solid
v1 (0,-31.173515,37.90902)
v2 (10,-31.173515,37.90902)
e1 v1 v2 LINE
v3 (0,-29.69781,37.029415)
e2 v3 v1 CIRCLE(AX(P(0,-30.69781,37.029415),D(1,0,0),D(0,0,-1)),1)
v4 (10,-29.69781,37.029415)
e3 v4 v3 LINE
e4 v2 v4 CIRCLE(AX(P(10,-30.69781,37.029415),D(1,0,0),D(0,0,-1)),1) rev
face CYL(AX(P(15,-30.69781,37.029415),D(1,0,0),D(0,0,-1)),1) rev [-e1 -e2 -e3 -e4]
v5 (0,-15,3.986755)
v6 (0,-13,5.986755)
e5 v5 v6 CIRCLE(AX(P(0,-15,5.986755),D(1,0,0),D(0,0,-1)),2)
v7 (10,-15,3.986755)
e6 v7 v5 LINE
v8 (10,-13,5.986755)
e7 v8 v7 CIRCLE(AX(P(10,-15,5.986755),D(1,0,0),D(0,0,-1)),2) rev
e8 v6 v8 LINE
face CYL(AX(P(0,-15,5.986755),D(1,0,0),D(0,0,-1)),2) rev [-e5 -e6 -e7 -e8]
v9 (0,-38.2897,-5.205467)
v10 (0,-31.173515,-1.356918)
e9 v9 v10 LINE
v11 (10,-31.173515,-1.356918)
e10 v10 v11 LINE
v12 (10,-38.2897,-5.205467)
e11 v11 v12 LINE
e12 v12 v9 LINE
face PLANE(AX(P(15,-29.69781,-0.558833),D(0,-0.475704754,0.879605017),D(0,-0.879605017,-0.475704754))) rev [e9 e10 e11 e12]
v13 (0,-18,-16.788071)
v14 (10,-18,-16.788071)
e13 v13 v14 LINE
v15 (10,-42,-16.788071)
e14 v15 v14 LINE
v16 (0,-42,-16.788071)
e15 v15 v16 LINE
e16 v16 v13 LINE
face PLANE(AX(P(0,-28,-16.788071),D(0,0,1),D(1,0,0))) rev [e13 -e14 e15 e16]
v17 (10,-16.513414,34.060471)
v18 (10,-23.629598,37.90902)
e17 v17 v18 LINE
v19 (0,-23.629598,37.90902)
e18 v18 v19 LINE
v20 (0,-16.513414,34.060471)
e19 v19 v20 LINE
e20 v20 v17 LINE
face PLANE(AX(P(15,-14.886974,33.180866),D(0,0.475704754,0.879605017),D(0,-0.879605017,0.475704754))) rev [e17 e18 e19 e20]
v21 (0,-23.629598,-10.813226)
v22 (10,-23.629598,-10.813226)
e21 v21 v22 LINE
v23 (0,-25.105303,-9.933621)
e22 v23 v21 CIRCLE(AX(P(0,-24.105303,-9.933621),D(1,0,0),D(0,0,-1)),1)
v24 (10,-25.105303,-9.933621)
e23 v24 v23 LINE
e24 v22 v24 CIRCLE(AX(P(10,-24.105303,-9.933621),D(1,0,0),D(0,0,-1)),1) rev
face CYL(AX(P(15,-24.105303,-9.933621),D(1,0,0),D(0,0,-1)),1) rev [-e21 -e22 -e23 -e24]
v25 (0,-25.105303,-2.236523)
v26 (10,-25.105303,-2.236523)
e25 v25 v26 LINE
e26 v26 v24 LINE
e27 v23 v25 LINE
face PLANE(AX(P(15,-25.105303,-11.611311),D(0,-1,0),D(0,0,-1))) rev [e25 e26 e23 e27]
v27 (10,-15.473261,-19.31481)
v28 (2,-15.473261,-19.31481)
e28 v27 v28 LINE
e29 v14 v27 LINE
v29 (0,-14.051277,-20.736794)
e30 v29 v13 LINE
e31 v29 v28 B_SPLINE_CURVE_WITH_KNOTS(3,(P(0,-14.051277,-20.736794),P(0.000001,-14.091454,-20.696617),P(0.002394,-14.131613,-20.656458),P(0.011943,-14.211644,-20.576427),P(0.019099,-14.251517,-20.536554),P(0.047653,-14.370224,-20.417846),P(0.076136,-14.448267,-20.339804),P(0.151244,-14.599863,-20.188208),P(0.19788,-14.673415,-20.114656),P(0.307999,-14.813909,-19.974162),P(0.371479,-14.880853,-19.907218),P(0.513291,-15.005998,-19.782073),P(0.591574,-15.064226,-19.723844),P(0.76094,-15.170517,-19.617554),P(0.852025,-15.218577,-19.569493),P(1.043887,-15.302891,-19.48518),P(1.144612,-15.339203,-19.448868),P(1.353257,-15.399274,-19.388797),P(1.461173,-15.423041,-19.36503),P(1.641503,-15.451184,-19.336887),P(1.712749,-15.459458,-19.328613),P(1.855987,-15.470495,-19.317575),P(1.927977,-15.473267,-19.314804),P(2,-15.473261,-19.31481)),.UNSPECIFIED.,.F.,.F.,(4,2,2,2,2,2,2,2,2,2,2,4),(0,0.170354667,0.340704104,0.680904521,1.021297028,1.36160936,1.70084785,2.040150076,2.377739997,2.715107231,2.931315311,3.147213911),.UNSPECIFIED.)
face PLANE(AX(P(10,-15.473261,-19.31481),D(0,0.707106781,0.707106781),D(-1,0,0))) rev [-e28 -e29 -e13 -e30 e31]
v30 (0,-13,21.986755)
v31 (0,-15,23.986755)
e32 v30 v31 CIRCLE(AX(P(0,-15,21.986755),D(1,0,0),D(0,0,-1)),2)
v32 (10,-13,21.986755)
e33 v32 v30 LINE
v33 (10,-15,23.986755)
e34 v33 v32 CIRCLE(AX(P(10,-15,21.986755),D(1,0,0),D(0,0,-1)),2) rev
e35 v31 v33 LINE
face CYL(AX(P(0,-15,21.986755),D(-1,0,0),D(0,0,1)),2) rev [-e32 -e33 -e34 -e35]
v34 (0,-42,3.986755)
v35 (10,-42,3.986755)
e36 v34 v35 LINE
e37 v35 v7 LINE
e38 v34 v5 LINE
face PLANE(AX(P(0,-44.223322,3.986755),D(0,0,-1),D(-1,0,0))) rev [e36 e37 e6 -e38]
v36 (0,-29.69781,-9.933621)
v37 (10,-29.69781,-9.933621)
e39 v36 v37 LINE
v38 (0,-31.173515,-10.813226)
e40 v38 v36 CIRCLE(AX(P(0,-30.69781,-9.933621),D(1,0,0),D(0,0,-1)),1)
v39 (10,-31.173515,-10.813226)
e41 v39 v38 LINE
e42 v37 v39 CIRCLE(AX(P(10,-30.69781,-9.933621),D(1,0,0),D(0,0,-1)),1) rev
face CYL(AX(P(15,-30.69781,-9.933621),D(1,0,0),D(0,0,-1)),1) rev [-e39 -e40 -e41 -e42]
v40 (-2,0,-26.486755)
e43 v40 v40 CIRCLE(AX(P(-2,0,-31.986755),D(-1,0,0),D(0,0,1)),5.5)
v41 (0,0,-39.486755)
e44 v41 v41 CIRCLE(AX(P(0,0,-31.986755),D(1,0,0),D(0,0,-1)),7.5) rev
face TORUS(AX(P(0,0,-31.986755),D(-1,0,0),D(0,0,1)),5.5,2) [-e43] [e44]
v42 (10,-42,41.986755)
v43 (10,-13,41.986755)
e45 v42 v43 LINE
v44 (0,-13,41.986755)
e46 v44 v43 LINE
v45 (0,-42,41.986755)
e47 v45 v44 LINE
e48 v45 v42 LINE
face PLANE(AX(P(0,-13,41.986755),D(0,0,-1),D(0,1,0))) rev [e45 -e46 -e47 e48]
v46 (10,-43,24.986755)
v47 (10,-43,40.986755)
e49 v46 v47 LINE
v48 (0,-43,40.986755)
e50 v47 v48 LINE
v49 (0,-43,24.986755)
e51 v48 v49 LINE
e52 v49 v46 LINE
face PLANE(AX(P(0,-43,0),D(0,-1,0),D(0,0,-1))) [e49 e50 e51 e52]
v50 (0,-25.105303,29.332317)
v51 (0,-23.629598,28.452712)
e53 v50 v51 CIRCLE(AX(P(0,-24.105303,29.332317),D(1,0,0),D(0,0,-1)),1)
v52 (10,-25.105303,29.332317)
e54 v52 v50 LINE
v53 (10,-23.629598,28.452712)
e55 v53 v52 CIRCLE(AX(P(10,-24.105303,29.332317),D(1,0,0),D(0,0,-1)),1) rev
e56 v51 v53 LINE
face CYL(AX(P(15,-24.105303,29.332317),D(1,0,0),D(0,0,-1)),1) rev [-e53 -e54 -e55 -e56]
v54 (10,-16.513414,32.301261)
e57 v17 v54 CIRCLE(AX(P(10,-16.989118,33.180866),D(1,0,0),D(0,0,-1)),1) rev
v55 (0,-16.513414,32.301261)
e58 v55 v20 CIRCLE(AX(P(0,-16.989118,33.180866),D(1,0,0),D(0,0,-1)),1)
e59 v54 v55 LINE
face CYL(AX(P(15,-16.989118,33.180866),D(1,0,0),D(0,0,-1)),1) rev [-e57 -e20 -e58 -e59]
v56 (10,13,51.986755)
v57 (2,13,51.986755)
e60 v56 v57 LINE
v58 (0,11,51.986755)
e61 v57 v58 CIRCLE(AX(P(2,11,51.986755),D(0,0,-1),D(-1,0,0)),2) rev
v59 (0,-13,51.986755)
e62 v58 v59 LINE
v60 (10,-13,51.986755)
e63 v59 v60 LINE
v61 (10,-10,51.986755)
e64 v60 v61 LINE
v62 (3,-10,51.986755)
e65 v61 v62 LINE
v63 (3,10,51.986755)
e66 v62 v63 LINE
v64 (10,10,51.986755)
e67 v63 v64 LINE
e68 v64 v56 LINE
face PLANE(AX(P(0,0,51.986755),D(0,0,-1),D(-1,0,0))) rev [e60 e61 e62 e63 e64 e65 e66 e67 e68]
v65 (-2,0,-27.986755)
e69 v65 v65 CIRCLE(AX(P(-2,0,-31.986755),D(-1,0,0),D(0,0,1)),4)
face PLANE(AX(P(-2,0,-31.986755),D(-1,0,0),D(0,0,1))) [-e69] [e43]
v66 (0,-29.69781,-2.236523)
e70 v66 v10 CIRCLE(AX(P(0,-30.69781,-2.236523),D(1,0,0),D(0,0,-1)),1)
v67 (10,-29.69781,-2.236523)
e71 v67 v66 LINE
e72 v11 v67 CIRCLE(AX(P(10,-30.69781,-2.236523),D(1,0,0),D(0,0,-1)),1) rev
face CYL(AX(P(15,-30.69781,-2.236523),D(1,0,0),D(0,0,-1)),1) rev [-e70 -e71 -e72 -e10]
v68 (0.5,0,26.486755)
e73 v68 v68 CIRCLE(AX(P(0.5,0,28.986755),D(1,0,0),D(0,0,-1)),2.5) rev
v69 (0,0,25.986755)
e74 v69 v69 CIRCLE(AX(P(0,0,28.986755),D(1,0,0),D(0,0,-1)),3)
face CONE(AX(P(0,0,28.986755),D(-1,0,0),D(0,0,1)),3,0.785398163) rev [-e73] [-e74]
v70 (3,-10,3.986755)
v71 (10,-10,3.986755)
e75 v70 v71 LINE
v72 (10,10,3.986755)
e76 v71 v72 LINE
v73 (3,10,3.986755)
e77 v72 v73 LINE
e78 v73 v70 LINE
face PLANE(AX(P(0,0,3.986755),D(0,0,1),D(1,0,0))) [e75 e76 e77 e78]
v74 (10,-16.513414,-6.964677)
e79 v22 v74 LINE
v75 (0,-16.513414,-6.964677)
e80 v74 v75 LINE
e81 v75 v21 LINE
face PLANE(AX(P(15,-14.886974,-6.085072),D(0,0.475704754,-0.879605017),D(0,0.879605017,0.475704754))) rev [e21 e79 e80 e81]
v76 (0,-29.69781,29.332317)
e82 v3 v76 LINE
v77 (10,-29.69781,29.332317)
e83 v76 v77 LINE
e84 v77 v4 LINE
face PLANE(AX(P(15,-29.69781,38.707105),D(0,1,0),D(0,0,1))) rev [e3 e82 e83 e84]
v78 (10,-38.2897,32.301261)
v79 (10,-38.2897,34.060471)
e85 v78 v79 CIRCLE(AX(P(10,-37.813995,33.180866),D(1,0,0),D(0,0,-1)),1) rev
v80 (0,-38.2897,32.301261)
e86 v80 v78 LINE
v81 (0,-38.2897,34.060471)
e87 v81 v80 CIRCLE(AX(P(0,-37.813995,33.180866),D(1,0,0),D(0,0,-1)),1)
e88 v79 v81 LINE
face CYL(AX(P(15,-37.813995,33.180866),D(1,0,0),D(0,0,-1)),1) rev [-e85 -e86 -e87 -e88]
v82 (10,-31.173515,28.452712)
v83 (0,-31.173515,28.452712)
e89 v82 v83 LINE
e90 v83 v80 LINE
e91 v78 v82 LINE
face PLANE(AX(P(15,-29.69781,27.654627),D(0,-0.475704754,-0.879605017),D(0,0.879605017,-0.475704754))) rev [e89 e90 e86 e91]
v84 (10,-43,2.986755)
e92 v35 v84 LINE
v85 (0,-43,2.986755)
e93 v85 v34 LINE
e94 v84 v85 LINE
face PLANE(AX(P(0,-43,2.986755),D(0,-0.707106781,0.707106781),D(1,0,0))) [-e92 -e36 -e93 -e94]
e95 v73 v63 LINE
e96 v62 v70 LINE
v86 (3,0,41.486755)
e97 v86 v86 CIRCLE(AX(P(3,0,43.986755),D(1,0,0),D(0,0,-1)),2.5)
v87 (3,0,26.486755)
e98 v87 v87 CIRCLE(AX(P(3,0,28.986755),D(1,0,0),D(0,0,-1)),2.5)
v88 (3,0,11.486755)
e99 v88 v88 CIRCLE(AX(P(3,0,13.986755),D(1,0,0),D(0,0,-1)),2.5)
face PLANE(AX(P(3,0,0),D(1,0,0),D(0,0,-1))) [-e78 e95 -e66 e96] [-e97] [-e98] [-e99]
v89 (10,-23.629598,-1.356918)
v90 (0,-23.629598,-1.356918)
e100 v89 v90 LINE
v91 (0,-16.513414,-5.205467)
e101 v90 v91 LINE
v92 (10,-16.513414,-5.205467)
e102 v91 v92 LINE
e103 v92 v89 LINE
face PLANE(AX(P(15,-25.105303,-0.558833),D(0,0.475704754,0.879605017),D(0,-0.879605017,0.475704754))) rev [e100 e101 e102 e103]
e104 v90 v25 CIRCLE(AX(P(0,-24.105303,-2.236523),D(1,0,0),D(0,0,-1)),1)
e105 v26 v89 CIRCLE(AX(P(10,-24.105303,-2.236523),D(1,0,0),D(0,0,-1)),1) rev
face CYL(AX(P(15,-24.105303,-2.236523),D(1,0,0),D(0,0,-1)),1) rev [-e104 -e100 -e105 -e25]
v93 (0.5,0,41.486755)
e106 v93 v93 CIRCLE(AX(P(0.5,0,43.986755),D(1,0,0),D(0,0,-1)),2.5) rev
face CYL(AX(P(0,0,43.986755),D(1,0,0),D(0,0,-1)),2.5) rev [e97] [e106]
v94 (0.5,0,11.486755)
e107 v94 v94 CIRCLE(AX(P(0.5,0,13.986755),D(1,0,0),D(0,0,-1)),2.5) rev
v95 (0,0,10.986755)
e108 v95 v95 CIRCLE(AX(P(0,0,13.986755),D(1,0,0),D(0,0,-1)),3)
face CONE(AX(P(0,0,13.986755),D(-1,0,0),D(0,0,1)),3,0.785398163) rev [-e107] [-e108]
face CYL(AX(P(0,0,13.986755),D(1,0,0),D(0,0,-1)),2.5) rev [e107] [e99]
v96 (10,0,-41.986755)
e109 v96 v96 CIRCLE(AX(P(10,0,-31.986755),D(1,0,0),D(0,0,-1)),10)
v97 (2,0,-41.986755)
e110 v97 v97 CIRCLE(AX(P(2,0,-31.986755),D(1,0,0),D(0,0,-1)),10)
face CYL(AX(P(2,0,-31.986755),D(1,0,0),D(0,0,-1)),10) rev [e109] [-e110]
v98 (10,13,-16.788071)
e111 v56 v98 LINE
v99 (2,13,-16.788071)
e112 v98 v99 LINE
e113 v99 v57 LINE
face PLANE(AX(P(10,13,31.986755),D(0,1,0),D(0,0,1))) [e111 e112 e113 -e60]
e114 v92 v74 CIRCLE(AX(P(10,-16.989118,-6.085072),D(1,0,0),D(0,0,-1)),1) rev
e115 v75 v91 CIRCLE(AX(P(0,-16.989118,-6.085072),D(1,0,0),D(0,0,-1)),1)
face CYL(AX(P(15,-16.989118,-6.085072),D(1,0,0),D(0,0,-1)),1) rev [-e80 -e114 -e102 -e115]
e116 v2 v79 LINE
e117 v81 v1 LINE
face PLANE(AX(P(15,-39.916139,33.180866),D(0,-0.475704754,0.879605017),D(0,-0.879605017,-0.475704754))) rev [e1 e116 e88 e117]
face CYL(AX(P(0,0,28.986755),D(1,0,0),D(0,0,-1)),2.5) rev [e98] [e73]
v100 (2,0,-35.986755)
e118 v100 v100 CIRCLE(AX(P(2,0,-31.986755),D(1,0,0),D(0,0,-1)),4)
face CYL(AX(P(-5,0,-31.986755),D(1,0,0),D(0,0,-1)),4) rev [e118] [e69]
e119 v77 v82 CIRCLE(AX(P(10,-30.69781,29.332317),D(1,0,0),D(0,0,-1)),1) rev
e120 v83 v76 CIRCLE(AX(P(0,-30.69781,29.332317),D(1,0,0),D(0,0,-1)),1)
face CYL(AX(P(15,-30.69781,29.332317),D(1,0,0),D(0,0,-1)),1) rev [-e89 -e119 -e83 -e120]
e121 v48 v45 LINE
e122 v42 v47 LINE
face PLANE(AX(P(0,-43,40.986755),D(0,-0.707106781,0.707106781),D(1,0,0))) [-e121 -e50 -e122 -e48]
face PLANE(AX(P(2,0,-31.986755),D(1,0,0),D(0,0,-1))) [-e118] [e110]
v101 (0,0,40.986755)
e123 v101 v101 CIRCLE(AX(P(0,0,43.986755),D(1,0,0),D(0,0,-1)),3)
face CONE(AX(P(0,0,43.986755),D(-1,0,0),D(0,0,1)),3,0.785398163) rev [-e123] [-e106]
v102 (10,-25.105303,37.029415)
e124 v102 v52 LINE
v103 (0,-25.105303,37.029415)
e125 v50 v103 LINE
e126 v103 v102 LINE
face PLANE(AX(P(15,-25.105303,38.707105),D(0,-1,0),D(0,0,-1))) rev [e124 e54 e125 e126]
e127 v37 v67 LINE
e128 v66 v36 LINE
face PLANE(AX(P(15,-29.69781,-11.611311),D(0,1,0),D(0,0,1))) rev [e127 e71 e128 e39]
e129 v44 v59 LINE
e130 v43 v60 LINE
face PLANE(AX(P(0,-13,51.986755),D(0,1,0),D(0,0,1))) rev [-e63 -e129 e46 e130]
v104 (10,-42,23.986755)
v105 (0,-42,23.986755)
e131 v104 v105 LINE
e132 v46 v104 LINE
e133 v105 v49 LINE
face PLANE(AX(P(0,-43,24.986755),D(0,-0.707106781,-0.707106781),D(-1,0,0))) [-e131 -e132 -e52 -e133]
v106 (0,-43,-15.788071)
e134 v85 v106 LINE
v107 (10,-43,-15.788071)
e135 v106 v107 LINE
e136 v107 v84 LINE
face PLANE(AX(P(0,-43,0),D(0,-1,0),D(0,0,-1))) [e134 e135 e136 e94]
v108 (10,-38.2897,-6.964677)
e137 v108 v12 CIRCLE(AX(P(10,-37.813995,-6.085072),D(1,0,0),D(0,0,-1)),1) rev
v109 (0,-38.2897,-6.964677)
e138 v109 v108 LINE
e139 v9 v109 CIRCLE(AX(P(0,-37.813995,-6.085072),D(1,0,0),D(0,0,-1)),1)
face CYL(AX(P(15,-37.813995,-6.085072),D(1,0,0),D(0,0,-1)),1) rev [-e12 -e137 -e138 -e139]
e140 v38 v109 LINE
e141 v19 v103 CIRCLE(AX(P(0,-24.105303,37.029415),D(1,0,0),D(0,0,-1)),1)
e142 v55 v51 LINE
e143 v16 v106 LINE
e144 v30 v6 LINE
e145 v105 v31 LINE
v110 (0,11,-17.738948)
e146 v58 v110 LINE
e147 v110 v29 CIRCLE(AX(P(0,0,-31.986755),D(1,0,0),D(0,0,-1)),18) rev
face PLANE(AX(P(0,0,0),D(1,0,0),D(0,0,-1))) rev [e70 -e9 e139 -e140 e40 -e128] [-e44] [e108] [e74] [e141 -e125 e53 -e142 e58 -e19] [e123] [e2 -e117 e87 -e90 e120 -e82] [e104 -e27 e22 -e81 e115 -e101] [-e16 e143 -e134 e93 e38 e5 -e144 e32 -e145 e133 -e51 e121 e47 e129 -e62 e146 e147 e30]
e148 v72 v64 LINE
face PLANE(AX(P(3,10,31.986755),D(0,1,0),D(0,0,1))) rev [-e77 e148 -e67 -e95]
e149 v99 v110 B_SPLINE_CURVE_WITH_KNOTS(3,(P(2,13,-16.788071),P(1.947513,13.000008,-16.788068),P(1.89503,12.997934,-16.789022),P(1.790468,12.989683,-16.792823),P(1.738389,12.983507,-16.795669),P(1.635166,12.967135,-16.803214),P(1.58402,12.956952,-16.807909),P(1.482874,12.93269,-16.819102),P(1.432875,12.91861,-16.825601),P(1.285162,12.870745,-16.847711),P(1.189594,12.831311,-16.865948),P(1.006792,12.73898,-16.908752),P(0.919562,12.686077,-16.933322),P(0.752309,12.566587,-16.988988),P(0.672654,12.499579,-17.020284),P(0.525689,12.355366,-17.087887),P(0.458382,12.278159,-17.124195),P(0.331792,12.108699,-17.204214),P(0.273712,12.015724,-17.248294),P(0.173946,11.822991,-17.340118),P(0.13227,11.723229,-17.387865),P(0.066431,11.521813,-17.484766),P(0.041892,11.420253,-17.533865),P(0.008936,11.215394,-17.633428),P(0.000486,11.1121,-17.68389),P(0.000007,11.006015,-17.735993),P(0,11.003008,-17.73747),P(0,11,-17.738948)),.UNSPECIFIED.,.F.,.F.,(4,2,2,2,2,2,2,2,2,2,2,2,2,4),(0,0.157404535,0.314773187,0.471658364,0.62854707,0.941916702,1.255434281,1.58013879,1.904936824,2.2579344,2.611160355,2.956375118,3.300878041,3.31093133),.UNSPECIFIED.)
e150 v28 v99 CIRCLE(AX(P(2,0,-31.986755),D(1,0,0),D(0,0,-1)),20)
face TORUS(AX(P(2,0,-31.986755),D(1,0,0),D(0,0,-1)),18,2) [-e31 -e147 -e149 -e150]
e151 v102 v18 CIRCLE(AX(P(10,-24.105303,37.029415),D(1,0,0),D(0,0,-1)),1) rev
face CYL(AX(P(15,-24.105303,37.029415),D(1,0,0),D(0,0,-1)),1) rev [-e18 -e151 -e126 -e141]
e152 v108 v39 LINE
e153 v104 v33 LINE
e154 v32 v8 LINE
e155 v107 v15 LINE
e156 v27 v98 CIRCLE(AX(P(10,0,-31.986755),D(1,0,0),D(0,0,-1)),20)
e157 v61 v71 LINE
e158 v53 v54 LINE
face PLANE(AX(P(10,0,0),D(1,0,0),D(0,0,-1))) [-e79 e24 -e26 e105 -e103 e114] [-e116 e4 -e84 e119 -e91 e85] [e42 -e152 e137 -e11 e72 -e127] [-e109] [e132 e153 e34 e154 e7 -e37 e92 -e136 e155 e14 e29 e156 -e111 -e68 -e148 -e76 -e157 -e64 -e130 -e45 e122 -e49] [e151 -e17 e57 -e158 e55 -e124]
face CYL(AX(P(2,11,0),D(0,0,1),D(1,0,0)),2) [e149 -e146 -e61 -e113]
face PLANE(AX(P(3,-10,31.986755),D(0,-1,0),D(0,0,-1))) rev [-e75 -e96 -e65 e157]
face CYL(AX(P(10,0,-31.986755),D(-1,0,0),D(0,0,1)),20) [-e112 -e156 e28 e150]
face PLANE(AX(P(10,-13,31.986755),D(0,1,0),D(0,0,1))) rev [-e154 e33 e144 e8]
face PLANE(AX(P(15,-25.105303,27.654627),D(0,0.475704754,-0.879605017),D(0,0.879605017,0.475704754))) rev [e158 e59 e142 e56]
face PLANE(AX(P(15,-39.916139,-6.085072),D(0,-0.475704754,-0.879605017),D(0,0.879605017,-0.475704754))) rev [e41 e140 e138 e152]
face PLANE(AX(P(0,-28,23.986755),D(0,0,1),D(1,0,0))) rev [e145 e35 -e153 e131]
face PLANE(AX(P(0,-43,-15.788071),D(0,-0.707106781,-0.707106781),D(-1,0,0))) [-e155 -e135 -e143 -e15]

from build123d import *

# Parameters (mm, degrees)
SKETCH_1_R          = 20
SKETCH_1_W          = 63.973509934
SKETCH_1_H          = 26
EXTRUDE_1_DEPTH     = 10
SKETCH_2_W          = 45
SKETCH_2_H          = 20
CUT_EXTRUDE_1_DEPTH = 7
SKETCH_3_R          = 10
CUT_EXTRUDE_2_DEPTH = 8
SKETCH_4_R          = 4
CUT_EXTRUDE_3_DEPTH = 7
SKETCH_6_W          = 10
SKETCH_6_H          = 8
EXTRUDE_2_DEPTH     = 15
CHAMFER_2_SIZE      = 5
EXTRUDE_3_DEPTH     = 20
SKETCH_8_W          = 10
SKETCH_8_H          = 12.77482578
EXTRUDE_4_DEPTH     = 15
SKETCH_9_W          = 7
SKETCH_9_H          = 20
EXTRUDE_5_DEPTH     = 10
SKETCH_10_W         = 7
SKETCH_10_H         = 20
EXTRUDE_6_DEPTH     = 7
SKETCH_11_W         = 10
SKETCH_11_H         = 15
CUT_EXTRUDE_5_DEPTH = 60.88841868
SKETCH_12_W         = 10
SKETCH_12_H         = 18
SKETCH_12_H_2       = 20.77482578
EXTRUDE_7_DEPTH     = 15
CUT_EXTRUDE_6_DEPTH = 15
FILLET_1_R          = 1
CHAMFER_3_SIZE      = 1
FILLET_2_R          = 2
SKETCH_14_R         = 7.5
SKETCH_14_R_2       = 4
EXTRUDE_8_DEPTH     = 2
FILLET_3_R          = 2
SKETCH_16_R         = 2.5
CUT_EXTRUDE_7_DEPTH = 3
CHAMFER_4_SIZE      = 0.5
FILLET_4_R          = 2


# Some blends are built 0.0001 mm under size
with BuildPart() as part:
    # 草图1 → 凸台-拉伸1 (new body)
    with BuildSketch(Plane(origin=(0, 0, 0), x_dir=(0, 0, -1), z_dir=(1, 0, 0))):
        with Locations((31.986754967, 0)):
            Circle(SKETCH_1_R)
        Rectangle(SKETCH_1_W, SKETCH_1_H)
    extrude(amount=EXTRUDE_1_DEPTH)

    # 草图2 → 切除-拉伸1 (cut)
    with BuildSketch(Plane(origin=(10, 0, 0), x_dir=(0, 0, -1), z_dir=(1, 0, 0))):
        with Locations((-9.486754967, 0)):
            Rectangle(SKETCH_2_W, SKETCH_2_H)
    extrude(amount=-CUT_EXTRUDE_1_DEPTH, mode=Mode.SUBTRACT)

    # 草图3 → 切除-拉伸2 (cut)
    with BuildSketch(Plane(origin=(10, 0, 0), x_dir=(0, 0, -1), z_dir=(1, 0, 0))):
        with Locations((31.986754967, 0)):
            Circle(SKETCH_3_R)
    extrude(amount=-CUT_EXTRUDE_2_DEPTH, mode=Mode.SUBTRACT)

    # 草图4 → 切除-拉伸3 (cut)
    with BuildSketch(Plane(origin=(2, 0, 0), x_dir=(0, 0, -1), z_dir=(1, 0, 0))):
        with Locations((31.986754967, 0)):
            Circle(SKETCH_4_R)
    extrude(amount=-CUT_EXTRUDE_3_DEPTH, mode=Mode.SUBTRACT)

    # 草图6 → 凸台-拉伸2 (add)
    with BuildSketch(Plane.XZ.offset(13)):
        with Locations((5, -12.788070813)):
            Rectangle(SKETCH_6_W, SKETCH_6_H)
        with Locations((5, 27.986754967)):
            Rectangle(SKETCH_6_W, SKETCH_6_H)
    extrude(amount=EXTRUDE_2_DEPTH)

    # 倒角2
    # the kernel refuses this chamfer: 5, 3.546264764 mm, written as the material it adds along each edge
    with BuildSketch(Plane(origin=(10, -13, -16.788070813), x_dir=(0, -0.6995038411281902, -0.7146288381019251), z_dir=(-1, 0, 0))) as chamfer_2_piece_1:
        with BuildLine():
            Line((3.535736125, 0), (CHAMFER_2_SIZE * 0.699503841128, CHAMFER_2_SIZE * 0.714628838102))
            Line((CHAMFER_2_SIZE * 0.699503841128, CHAMFER_2_SIZE * 0.714628838102), (0, 0))
            ThreePointArc((0, 0), (1.768947181, 0.07828713), (3.535736125, 0))
        make_face()
    extrude(amount=10)

    # 草图7 → 凸台-拉伸3 (add)
    with BuildSketch(Plane.XY.offset(31.986754967)):
        Polygon((3, -10), (3, 10), (10, 10), (10, 13), (0, 13), (0, -28), (10, -28), (10, -10), align=None)
    extrude(amount=EXTRUDE_3_DEPTH)

    # 草图8 → 凸台-拉伸4 (add)
    with BuildSketch(Plane.XZ.offset(13)):
        with Locations((5, -2.400657923)):
            Rectangle(SKETCH_8_W, SKETCH_8_H)
    extrude(amount=EXTRUDE_4_DEPTH)

    # 草图9 → 凸台-拉伸5 (add)
    with BuildSketch(Plane.XY.offset(-13.013245033)):
        with Locations((6.5, 0)):
            Rectangle(SKETCH_9_W, SKETCH_9_H)
    extrude(amount=EXTRUDE_5_DEPTH)

    # 草图10 → 凸台-拉伸6 (add)
    with BuildSketch(Plane.XY.offset(-3.013245033)):
        with Locations((6.5, 0)):
            Rectangle(SKETCH_10_W, SKETCH_10_H)
    extrude(amount=EXTRUDE_6_DEPTH)

    # 草图11 → 切除-拉伸5 (cut, through all)
    with BuildSketch(Plane(origin=(10, 0, 0), x_dir=(0, 0, -1), z_dir=(1, 0, 0))):
        with Locations((-46.986754967, -20.5)):
            Rectangle(SKETCH_11_W, SKETCH_11_H)
    extrude(amount=-CUT_EXTRUDE_5_DEPTH, mode=Mode.SUBTRACT)

    # 草图12 → 凸台-拉伸7 (add)
    with BuildSketch(Plane.XZ.offset(28)):
        with Locations((5, 32.986754967)):
            Rectangle(SKETCH_12_W, SKETCH_12_H)
        with Locations((5, -6.400657923)):
            Rectangle(SKETCH_12_W, SKETCH_12_H_2)
    extrude(amount=EXTRUDE_7_DEPTH)

    # 草图13 → 切除-拉伸6 (cut)
    with BuildSketch(Plane.ZY):
        Polygon((-11.611311333, -29.697810406), (-0.558833166, -29.697810406), (-6.085072249, -39.916139278), align=None)
        Polygon((-6.085072249, -14.886974177), (-11.611311333, -25.105303048), (-0.558833166, -25.105303048), align=None)
        Polygon((38.707104745, -25.105303048), (27.654626578, -25.105303048), (33.180865662, -14.886974177), align=None)
        Polygon((33.180865662, -39.916139278), (38.707104745, -29.697810406), (27.654626578, -29.697810406), align=None)
    extrude(amount=-CUT_EXTRUDE_6_DEPTH, mode=Mode.SUBTRACT)

    # 圆角1
    fillet_1_edges = [part.edges().sort_by_distance(p)[0] for p in [
        (5, -39.916139278, 33.180865662),
        (5, -29.697810406, 27.654626578),
        (5, -29.697810406, 38.707104745),
        (5, -14.886974177, 33.180865662),
        (5, -25.105303048, 38.707104745),
        (5, -25.105303048, 27.654626578),
        (5, -14.886974177, -6.085072249),
        (5, -25.105303048, -0.558833166),
        (5, -25.105303048, -11.611311333),
        (5, -39.916139278, -6.085072249),
        (5, -29.697810406, -11.611311333),
        (5, -29.697810406, -0.558833166),
    ]]
    fillet(fillet_1_edges, radius=FILLET_1_R)

    # 倒角3
    chamfer_3_edges = [part.edges().sort_by_distance(p)[0] for p in [
        (5, -43, 41.986754967),
        (5, -43, 23.986754967),
        (5, -43, 3.986754967),
        (5, -43, -16.788070813),
    ]]
    chamfer(chamfer_3_edges, length=CHAMFER_3_SIZE)

    # 圆角2
    fillet_2_edges = [part.edges().sort_by_distance(p)[0] for p in [
        (5, -13, 3.986754967),
        (5, -13, 23.986754967),
    ]]
    fillet(fillet_2_edges, radius=FILLET_2_R)

    # 草图14 → 凸台-拉伸8 (add)
    with BuildSketch(Plane.ZY):
        with Locations(Location((-31.986754967, 0, 0), (0, 0, 180))):
            Circle(SKETCH_14_R)
        with Locations(Location((-31.986754967, 0, 0), (0, 0, 180))):
            Circle(SKETCH_14_R_2, mode=Mode.SUBTRACT)
    extrude(amount=EXTRUDE_8_DEPTH)

    # 圆角3
    fillet_3_edges = [part.edges().sort_by_distance(p)[0] for p in [
        (-2, 0, -24.486754967),
    ]]
    fillet(fillet_3_edges, radius=FILLET_3_R - 0.0001)  # a hair under: the kernel refuses the full size

    # 草图16 → 切除-拉伸7 (cut)
    with BuildSketch(Plane(origin=(3, 0, 0), x_dir=(0, 0, -1), z_dir=(1, 0, 0))):
        with Locations((-43.986754967, 0)):
            Circle(SKETCH_16_R)
        with Locations((-28.986754967, 0)):
            Circle(SKETCH_16_R)
        with Locations((-13.986754967, 0)):
            Circle(SKETCH_16_R)
    extrude(amount=-CUT_EXTRUDE_7_DEPTH, mode=Mode.SUBTRACT)

    # 倒角4
    chamfer_4_edges = [part.edges().sort_by_distance(p)[0] for p in [
        (0, 0, 46.486754967),
        (0, 0, 31.486754967),
        (0, 0, 16.486754967),
    ]]
    chamfer(chamfer_4_edges, length=CHAMFER_4_SIZE)

    # 圆角4
    fillet_4_edges = [part.edges().sort_by_distance(p)[0] for p in [
        (0, 13, 17.599342077),
        (0, 1.767868063, -51.908467808),
    ]]
    fillet(fillet_4_edges, radius=FILLET_4_R)


solid = part.part
